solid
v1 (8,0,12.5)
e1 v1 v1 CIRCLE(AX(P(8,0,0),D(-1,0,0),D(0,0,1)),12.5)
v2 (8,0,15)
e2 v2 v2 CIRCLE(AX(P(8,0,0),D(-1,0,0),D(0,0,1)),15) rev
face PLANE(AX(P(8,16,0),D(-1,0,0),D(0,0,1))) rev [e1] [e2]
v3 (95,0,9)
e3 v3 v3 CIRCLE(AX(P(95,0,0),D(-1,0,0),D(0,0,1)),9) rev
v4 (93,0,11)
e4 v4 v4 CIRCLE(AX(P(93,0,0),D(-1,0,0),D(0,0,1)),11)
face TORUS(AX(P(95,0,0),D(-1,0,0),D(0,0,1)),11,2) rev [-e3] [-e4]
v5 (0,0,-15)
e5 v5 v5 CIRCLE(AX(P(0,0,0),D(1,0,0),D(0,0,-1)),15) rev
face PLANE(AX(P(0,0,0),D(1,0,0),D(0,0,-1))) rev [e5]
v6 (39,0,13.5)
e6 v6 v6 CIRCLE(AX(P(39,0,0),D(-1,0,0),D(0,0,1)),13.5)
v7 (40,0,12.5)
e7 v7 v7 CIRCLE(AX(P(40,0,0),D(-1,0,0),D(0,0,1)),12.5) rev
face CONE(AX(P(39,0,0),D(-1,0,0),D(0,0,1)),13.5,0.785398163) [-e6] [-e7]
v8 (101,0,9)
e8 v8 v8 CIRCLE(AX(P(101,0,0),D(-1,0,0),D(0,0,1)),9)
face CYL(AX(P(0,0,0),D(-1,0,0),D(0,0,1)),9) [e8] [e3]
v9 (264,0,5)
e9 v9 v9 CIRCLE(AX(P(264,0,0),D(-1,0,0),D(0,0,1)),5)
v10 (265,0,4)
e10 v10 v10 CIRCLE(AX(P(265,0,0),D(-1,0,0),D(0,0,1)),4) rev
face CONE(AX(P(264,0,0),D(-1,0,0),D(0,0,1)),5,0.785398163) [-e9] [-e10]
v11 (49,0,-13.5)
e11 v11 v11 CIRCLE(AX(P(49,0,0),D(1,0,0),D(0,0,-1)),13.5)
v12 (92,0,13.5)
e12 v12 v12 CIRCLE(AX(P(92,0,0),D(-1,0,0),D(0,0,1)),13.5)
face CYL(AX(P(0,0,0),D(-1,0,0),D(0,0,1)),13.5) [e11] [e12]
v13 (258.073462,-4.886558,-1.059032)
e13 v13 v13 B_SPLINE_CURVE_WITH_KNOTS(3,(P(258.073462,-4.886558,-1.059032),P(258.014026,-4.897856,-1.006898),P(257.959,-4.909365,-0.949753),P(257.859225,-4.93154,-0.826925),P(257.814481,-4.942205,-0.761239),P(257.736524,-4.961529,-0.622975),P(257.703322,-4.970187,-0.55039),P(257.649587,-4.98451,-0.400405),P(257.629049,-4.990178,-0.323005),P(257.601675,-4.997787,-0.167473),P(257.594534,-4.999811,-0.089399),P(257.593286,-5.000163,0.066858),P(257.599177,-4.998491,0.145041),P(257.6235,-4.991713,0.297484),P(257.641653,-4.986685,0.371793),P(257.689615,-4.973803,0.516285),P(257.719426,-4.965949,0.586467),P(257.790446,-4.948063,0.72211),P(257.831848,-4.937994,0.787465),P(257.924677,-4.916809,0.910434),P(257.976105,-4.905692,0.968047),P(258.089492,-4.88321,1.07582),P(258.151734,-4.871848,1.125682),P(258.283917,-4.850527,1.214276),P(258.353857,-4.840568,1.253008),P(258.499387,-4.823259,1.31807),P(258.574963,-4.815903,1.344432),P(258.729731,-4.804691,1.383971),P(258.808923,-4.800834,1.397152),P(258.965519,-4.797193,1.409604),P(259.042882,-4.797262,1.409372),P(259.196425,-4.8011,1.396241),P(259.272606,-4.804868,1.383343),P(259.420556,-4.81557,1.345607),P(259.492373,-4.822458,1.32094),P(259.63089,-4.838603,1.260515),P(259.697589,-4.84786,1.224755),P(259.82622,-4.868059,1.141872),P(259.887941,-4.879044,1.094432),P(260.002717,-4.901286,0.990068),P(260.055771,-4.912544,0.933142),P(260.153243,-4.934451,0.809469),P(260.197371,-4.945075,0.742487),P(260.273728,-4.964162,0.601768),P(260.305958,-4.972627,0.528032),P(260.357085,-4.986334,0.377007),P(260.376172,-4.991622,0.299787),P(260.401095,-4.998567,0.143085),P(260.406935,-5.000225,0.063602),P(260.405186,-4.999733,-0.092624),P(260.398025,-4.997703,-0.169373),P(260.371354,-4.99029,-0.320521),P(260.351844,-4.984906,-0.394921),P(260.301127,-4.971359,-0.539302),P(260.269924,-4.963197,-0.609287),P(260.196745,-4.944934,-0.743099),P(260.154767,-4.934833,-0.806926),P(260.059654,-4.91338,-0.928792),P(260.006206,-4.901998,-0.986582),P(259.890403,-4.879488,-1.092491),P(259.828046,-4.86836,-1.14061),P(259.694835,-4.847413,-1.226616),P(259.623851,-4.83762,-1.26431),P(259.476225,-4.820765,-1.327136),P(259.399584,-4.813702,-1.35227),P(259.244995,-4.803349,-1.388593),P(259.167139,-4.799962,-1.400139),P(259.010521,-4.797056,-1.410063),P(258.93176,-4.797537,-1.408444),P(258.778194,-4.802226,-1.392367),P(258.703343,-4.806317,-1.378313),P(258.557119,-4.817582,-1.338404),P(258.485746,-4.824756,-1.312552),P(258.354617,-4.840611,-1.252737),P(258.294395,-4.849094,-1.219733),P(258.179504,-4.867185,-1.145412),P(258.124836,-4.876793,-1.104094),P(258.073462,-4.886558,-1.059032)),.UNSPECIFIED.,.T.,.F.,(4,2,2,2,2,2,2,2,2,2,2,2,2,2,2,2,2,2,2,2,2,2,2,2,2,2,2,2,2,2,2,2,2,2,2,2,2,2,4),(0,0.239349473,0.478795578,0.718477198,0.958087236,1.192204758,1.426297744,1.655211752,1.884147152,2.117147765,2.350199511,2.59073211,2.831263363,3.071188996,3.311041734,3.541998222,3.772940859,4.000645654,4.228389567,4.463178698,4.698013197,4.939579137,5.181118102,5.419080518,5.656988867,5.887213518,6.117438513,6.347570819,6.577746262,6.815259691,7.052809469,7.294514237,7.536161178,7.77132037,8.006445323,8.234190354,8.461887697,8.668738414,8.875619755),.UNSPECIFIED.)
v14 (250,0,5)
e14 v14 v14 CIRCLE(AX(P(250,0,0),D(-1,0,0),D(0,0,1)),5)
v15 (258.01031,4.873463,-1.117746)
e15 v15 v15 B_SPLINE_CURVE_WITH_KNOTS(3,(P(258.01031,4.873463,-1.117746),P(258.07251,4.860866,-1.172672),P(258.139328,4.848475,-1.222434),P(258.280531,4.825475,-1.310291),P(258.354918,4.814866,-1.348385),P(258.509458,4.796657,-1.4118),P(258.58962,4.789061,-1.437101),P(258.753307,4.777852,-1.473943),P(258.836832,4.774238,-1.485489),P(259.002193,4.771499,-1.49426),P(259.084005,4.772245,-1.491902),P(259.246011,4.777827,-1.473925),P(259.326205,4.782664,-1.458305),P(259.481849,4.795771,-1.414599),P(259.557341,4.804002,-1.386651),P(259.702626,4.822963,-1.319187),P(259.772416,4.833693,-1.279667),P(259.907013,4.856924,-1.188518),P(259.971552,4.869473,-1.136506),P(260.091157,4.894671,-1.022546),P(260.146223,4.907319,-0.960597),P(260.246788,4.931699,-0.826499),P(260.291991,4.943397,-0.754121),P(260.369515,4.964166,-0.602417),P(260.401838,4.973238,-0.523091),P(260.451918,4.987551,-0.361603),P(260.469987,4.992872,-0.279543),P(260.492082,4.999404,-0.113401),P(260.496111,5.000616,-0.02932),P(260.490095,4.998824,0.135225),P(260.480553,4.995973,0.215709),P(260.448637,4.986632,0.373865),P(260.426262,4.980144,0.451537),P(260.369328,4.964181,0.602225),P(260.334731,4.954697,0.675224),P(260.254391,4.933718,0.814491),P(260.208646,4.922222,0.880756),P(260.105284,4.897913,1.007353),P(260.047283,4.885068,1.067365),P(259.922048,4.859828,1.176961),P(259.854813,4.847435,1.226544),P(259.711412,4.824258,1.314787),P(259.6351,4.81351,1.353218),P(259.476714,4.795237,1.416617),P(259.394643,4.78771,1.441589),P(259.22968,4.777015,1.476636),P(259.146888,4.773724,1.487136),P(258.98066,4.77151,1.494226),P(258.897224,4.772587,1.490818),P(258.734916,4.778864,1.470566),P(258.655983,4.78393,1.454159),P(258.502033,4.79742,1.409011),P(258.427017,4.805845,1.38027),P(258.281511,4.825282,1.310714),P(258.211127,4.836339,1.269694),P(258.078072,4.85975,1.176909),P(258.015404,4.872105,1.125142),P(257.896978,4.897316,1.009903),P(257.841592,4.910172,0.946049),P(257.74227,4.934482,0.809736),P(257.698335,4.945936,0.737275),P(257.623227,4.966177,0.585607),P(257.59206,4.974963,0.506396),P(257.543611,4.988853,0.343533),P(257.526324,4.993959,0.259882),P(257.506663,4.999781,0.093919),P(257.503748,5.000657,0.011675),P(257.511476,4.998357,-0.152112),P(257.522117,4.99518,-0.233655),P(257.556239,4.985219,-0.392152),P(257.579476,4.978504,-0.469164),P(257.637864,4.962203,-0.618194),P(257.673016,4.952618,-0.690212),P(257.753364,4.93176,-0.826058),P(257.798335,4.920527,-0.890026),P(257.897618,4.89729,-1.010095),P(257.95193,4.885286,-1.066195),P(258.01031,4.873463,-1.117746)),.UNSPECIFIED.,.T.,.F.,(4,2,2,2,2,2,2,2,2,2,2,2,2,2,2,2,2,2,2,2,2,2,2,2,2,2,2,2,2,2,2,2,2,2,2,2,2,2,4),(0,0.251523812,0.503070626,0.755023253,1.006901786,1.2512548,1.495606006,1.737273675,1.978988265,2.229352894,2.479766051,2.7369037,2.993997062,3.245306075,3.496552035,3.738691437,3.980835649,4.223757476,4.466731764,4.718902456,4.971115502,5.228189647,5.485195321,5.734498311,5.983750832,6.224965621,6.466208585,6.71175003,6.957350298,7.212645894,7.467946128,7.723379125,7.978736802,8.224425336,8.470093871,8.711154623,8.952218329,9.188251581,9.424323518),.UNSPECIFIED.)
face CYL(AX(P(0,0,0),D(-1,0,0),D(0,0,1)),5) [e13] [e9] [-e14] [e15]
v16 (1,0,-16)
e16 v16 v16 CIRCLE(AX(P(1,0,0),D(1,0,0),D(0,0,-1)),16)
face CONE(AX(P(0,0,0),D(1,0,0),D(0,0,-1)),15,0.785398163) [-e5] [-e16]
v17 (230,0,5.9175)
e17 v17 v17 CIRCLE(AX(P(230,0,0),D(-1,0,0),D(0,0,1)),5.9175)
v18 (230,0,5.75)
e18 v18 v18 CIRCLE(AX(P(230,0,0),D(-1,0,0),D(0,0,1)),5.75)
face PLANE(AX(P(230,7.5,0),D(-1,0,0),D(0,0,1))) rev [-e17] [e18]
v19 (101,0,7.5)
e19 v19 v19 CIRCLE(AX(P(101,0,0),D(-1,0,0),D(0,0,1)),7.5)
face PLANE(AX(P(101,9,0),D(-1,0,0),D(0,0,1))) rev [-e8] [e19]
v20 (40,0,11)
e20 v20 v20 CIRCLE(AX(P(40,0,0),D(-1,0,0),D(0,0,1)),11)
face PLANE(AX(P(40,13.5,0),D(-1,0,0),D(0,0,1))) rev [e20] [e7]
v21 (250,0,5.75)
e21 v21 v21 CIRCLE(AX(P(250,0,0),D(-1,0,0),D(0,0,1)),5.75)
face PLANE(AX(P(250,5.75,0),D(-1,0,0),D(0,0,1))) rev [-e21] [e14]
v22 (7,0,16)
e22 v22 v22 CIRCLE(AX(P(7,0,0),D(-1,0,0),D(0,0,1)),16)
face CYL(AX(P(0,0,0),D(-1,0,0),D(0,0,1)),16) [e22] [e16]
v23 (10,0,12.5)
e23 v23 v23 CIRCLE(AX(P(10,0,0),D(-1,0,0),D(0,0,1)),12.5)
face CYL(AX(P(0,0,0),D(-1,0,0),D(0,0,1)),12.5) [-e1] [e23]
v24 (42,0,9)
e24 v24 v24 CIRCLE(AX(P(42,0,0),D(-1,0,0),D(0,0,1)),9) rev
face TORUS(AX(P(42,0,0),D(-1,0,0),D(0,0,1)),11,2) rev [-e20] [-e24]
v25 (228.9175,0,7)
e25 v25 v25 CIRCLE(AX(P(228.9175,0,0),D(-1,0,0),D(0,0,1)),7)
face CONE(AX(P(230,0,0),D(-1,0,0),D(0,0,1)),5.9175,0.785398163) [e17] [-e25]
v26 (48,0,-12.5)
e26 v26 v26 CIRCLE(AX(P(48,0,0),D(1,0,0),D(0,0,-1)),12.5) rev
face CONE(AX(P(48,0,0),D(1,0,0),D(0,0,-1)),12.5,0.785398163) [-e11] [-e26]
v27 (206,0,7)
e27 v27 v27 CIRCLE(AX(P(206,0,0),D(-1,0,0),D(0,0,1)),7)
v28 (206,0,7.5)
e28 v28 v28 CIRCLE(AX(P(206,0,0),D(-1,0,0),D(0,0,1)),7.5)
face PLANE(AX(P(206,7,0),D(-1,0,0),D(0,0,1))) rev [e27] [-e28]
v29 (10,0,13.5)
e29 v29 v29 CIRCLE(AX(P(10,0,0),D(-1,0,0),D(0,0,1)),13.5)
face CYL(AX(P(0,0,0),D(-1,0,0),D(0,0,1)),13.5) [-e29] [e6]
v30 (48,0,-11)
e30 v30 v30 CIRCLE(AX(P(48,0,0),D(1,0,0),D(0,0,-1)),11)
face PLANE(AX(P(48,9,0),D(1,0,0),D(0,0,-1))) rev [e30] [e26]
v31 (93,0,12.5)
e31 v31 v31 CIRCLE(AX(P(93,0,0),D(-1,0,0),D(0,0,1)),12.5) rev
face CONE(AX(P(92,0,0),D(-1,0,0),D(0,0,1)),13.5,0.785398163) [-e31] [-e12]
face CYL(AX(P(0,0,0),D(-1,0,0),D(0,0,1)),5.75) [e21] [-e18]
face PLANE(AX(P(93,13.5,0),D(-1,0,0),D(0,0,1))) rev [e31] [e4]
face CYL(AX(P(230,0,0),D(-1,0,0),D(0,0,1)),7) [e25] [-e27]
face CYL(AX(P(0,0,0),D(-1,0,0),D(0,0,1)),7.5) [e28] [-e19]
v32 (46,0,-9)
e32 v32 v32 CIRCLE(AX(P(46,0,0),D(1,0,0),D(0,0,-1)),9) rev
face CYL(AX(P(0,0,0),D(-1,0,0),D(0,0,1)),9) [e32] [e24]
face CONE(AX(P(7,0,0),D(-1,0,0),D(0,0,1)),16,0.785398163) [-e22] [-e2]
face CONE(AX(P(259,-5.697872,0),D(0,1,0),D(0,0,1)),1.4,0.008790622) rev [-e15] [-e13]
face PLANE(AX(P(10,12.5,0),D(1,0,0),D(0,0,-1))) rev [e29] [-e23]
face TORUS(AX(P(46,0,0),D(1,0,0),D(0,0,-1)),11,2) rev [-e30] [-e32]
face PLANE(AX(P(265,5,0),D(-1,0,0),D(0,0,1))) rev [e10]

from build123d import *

# Parameters (mm, degrees)
CHAMFER_1_SIZE = 1
FILLET_1_R     = 2
FILLET_2_R     = 2


# Read off the part's stored shape, not the designer's step: M14 机械螺纹 螺柱1
with BuildPart() as part:
    # 草图1 → 旋转1 (revolve)
    with BuildSketch(Plane.XY, mode=Mode.PRIVATE) as revolve_1_sk:
        Polygon((0, 0), (0, 16), (8, 16), (8, 12.5), (10, 12.5), (10, 13.5), (40, 13.5), (40, 9), (48, 9), (48, 13.5), (93, 13.5), (93, 9), (101, 9), (101, 7.5), (230, 7.5), (230, 5.75), (250, 5.75), (250, 5), (265, 5), (265, 0), align=None)
    revolve(revolve_1_sk.sketch.rotate(Axis((0, 0, 0), (1, 0, 0)), 90), axis=Axis((0, 0, 0), (1, 0, 0)))

    # M14 机械螺纹 螺柱1 outline → M14 机械螺纹 螺柱1 (revolve, cut)
    with BuildSketch(Plane.YX):
        Polygon((7.5, 230), (5.9175, 230), (7, 228.9175), (7, 206), (7.5, 206), align=None)
    revolve(axis=Axis((0, 0, 0), (1, 0, 0)), mode=Mode.SUBTRACT)

    # 草图3 → 切除-旋转1 (revolve, cut)
    with BuildSketch(Plane.XY, mode=Mode.PRIVATE) as cut_revolve_1_sk:
        Polygon((259, -5.697872022), (260.4, -5.697872022), (260.5, 5.677594139), (259, 5.677594139), align=None)
    revolve(cut_revolve_1_sk.sketch.rotate(Axis((259, -22.643842163, 0), (0, 1, 0)), 131.522767303), axis=Axis((259, -22.643842163, 0), (0, 1, 0)), mode=Mode.SUBTRACT)

    # 倒角1
    chamfer_1_edges = [part.edges().sort_by_distance(p)[0] for p in [
        (265, 0, -5),
        (93, 0, -13.5),
        (48, 0, -13.5),
        (40, 0, -13.5),
        (8, 0, -16),
        (0, 0, -16),
    ]]
    chamfer(chamfer_1_edges, length=CHAMFER_1_SIZE)

    # 圆角1
    fillet_1_edges = [part.edges().sort_by_distance(p)[0] for p in [
        (48, 0, -9),
        (40, 0, -9),
    ]]
    fillet(fillet_1_edges, radius=FILLET_1_R)

    # 圆角2
    fillet_2_edges = [part.edges().sort_by_distance(p)[0] for p in [
        (93, 0, -9),
    ]]
    fillet(fillet_2_edges, radius=FILLET_2_R)


solid = part.part
